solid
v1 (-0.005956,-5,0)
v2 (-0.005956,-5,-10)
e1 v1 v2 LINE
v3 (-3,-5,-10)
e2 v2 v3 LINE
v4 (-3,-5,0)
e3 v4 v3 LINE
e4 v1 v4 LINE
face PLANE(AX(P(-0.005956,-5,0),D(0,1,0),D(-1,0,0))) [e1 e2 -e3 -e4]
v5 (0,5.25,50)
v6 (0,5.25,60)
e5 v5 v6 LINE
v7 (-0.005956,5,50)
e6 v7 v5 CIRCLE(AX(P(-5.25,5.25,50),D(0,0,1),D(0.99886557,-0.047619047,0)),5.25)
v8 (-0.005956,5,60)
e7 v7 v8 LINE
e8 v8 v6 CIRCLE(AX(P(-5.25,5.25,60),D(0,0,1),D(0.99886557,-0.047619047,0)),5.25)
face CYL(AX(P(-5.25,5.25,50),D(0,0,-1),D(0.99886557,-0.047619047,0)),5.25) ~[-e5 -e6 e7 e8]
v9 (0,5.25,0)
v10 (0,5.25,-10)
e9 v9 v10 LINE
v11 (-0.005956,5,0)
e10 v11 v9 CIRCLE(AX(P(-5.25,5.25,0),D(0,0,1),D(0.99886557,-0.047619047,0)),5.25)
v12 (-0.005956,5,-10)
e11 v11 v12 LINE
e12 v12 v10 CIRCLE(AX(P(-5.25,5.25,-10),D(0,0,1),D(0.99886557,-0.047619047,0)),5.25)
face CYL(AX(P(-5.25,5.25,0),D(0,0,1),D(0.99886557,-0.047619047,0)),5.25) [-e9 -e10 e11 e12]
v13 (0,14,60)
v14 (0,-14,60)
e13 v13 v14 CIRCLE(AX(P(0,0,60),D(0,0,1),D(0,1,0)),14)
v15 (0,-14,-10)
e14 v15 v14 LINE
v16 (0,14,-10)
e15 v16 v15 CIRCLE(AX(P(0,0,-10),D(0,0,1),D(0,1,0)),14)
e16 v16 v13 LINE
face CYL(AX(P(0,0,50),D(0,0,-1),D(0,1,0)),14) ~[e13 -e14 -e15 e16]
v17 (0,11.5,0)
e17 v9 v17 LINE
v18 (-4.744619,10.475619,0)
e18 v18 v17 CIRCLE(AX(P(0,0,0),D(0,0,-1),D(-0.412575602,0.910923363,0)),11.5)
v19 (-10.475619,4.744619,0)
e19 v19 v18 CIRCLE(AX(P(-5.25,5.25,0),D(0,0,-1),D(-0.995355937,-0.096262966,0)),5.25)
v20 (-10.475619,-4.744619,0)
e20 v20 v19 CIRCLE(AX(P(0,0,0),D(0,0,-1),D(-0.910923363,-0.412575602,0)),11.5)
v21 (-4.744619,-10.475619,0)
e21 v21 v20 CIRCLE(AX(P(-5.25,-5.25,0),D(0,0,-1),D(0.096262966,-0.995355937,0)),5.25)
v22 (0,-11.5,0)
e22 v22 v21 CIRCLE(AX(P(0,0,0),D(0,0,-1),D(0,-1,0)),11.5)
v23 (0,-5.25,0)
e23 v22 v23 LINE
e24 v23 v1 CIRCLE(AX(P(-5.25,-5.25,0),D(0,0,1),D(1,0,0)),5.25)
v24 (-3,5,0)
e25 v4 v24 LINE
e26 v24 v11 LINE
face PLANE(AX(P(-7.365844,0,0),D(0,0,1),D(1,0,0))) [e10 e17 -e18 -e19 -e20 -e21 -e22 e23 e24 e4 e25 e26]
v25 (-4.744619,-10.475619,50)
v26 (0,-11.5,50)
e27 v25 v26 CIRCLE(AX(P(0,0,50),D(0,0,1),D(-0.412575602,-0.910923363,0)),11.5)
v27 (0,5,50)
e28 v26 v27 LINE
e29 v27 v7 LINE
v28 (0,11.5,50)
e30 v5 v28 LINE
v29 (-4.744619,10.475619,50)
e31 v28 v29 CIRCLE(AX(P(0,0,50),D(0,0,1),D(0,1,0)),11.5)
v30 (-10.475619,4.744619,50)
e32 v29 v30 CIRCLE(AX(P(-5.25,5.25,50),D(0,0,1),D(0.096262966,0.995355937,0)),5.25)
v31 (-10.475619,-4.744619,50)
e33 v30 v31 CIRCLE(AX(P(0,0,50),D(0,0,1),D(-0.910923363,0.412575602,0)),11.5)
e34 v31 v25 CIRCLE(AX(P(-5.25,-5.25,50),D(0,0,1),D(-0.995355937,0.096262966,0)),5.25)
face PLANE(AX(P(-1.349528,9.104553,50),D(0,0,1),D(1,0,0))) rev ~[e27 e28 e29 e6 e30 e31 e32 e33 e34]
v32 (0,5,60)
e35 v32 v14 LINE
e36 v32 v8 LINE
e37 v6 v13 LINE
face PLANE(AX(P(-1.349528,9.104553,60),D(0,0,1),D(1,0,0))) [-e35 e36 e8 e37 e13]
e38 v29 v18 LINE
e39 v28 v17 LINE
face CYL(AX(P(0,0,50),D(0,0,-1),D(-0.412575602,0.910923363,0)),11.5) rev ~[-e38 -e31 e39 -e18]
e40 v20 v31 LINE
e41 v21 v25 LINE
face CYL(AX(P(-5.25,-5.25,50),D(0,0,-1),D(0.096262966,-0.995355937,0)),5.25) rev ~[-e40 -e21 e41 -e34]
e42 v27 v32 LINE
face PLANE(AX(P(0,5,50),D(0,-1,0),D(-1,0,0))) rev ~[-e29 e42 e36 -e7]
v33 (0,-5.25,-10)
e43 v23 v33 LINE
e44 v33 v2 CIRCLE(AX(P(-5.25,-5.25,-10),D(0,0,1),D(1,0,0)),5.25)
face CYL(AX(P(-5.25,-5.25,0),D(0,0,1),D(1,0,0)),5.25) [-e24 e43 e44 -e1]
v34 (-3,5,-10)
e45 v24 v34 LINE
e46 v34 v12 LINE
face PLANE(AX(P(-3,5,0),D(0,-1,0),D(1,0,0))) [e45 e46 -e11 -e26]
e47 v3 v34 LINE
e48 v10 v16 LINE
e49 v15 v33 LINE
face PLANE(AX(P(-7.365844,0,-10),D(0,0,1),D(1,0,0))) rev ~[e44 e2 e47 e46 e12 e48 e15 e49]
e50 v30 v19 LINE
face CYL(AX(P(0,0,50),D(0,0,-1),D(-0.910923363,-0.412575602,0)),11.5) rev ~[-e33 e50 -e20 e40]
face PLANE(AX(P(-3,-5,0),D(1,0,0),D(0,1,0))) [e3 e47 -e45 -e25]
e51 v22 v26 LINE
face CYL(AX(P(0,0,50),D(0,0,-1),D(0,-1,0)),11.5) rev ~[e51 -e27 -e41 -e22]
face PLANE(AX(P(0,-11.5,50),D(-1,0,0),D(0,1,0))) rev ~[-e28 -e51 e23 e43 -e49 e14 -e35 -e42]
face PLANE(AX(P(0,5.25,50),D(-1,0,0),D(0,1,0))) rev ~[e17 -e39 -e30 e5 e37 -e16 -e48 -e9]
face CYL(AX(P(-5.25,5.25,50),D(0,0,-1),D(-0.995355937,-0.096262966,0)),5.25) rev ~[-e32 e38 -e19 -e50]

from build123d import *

# Parameters (mm, degrees)
F1_DEPTH = 10
F2_DEPTH = 50
F3_DEPTH = 10
F4_START = 50
F4_DEPTH = 10


# Not quite as in the source:
# - a feature names something its author has since deleted; it is built from what else it names


with BuildPart() as f1:
    # F0 (on Top) → F1 (new body)
    with BuildSketch(Plane.XY):
        with BuildLine():
            Line((0, 11.5), (0, 14))
            ThreePointArc((0, 14), (-14, 0), (0, -14))
            Line((0, -14), (0, -11.5))
            ThreePointArc((0, -11.5), (-2.4269719101, -11.2409878279), (-4.7446194261, -10.4756186692))
            ThreePointArc((-4.7446194261, -10.4756186692), (-8.9623106012, -8.9623106012), (-10.4756186692, -4.7446194261))
            ThreePointArc((-10.4756186692, -4.7446194261), (-11.5, 0), (-10.4756186692, 4.7446194261))
            ThreePointArc((-10.4756186692, 4.7446194261), (-8.9623106012, 8.9623106012), (-4.7446194261, 10.4756186692))
            ThreePointArc((-4.7446194261, 10.4756186692), (-2.4269719101, 11.2409878279), (0, 11.5))
        make_face()
        with BuildLine():
            ThreePointArc((-4.7446194261, -10.4756186692), (-2.4269719101, -11.2409878279), (0, -11.5))
            Line((0, -11.5), (0, -9))
            Line((0, -9), (0, -5.25))
            ThreePointArc((0, -5.25), (-1.3631151282, -8.7791112186), (-4.7446194261, -10.4756186692))
        make_face()
        with BuildLine():
            Line((-5.25, -5.25), (0, -5.25))
            ThreePointArc((0, -5.25), (-0.001489151, -5.124964534), (-0.0059557591, -5))
            Line((-0.0059557591, -5), (-3, -5))
            Line((-3, -5), (-3, -0.5065835097))
            ThreePointArc((-3, -0.5065835097), (-4.0968383837, -0.1282114172), (-5.2499999999, 0))
            Line((-5.25, 0), (-5.25, -5.25))
        make_face()
        with BuildLine():
            ThreePointArc((-10.4756186692, -4.7446194261), (-8.1317279836, -8.1317279836), (-4.7446194261, -10.4756186692))
            ThreePointArc((-4.7446194261, -10.4756186692), (-1.3631151282, -8.7791112186), (0, -5.25))
            Line((0, -5.25), (-5.25, -5.25))
            Line((-5.25, -5.25), (-5.25, 0))
            ThreePointArc((-5.2499999999, 0), (-8.7791112186, -1.3631151282), (-10.4756186692, -4.7446194261))
        make_face()
        with BuildLine():
            ThreePointArc((-5.2499999999, 0), (-8.7791112186, 1.3631151282), (-10.4756186692, 4.7446194261))
            ThreePointArc((-10.4756186692, 4.7446194261), (-11.5, 0), (-10.4756186692, -4.7446194261))
            ThreePointArc((-10.4756186692, -4.7446194261), (-8.7791112186, -1.3631151282), (-5.2499999999, 0))
        make_face()
        with BuildLine():
            ThreePointArc((-3, 0.5065835097), (-4.0968383837, 0.1282114172), (-5.2499999999, 0))
            ThreePointArc((-5.2499999999, 0), (-4.0968383837, -0.1282114172), (-3, -0.5065835097))
            Line((-3, -0.5065835097), (-3, 0.5065835097))
        make_face()
        with BuildLine():
            ThreePointArc((0, 5.25), (-1.3631151282, 8.7791112186), (-4.7446194261, 10.4756186692))
            ThreePointArc((-4.7446194261, 10.4756186692), (-8.1317279836, 8.1317279836), (-10.4756186692, 4.7446194261))
            ThreePointArc((-10.4756186692, 4.7446194261), (-8.7791112186, 1.3631151282), (-5.2499999999, 0))
            Line((-5.25, 0), (-5.25, 5.25))
            Line((-5.25, 5.25), (0, 5.25))
        make_face()
        with BuildLine():
            Line((0, 9), (0, 11.5))
            ThreePointArc((0, 11.5), (-2.4269719101, 11.2409878279), (-4.7446194261, 10.4756186692))
            ThreePointArc((-4.7446194261, 10.4756186692), (-1.3631151282, 8.7791112186), (0, 5.25))
            Line((0, 5.25), (0, 6))
            Line((0, 6), (0, 9))
        make_face()
        with BuildLine():
            ThreePointArc((-10.4756186692, 4.7446194261), (-8.1317279836, 8.1317279836), (-4.7446194261, 10.4756186692))
            ThreePointArc((-4.7446194261, 10.4756186692), (-8.9623106012, 8.9623106012), (-10.4756186692, 4.7446194261))
        make_face()
        with BuildLine():
            ThreePointArc((-10.4756186692, -4.7446194261), (-8.9623106012, -8.9623106012), (-4.7446194261, -10.4756186692))
            ThreePointArc((-4.7446194261, -10.4756186692), (-8.1317279836, -8.1317279836), (-10.4756186692, -4.7446194261))
        make_face()
        with BuildLine():
            ThreePointArc((-0.0059557591, 5), (-0.001489151, 5.124964534), (0, 5.25))
            Line((0, 5.25), (-5.25, 5.25))
            Line((-5.25, 5.25), (-5.25, 0))
            ThreePointArc((-5.2499999999, 0), (-4.0968383837, 0.1282114172), (-3, 0.5065835097))
            Line((-3, 0.5065835097), (-3, 5))
            Line((-3, 5), (-0.0059557591, 5))
        make_face()
    extrude(amount=-F1_DEPTH)

    # F0 (on Top) → F2 (join)
    with BuildSketch(Plane.XY):
        with BuildLine():
            Line((0, 11.5), (0, 14))
            ThreePointArc((0, 14), (-14, 0), (0, -14))
            Line((0, -14), (0, -11.5))
            ThreePointArc((0, -11.5), (-2.4269719101, -11.2409878279), (-4.7446194261, -10.4756186692))
            ThreePointArc((-4.7446194261, -10.4756186692), (-8.9623106012, -8.9623106012), (-10.4756186692, -4.7446194261))
            ThreePointArc((-10.4756186692, -4.7446194261), (-11.5, 0), (-10.4756186692, 4.7446194261))
            ThreePointArc((-10.4756186692, 4.7446194261), (-8.9623106012, 8.9623106012), (-4.7446194261, 10.4756186692))
            ThreePointArc((-4.7446194261, 10.4756186692), (-2.4269719101, 11.2409878279), (0, 11.5))
        make_face()
    extrude(amount=F2_DEPTH)

    # F3 (add): a face of the model
    f3_faces = [f1.faces().sort_by_distance(p)[0] for p in [
        (-2.4930382043, 11.5469865939, 50),
    ]]
    extrude(f3_faces, amount=F3_DEPTH)

    # F0 (on Top) → F4 (join)
    with BuildSketch(Plane.XY.offset(F4_START)):
        with BuildLine():
            Line((0, 9), (0, 11.5))
            ThreePointArc((0, 11.5), (-2.4269719101, 11.2409878279), (-4.7446194261, 10.4756186692))
            ThreePointArc((-4.7446194261, 10.4756186692), (-1.3631151282, 8.7791112186), (0, 5.25))
            Line((0, 5.25), (0, 6))
            Line((0, 6), (0, 9))
        make_face()
        with BuildLine():
            ThreePointArc((-4.7446194261, -10.4756186692), (-2.4269719101, -11.2409878279), (0, -11.5))
            Line((0, -11.5), (0, -9))
            Line((0, -9), (0, -5.25))
            ThreePointArc((0, -5.25), (-1.3631151282, -8.7791112186), (-4.7446194261, -10.4756186692))
        make_face()
        with BuildLine():
            ThreePointArc((0, 5.25), (-1.3631151282, 8.7791112186), (-4.7446194261, 10.4756186692))
            ThreePointArc((-4.7446194261, 10.4756186692), (-8.1317279836, 8.1317279836), (-10.4756186692, 4.7446194261))
            ThreePointArc((-10.4756186692, 4.7446194261), (-8.7791112186, 1.3631151282), (-5.2499999999, 0))
            Line((-5.25, 0), (-5.25, 5.25))
            Line((-5.25, 5.25), (0, 5.25))
        make_face()
        with BuildLine():
            ThreePointArc((-10.4756186692, 4.7446194261), (-8.1317279836, 8.1317279836), (-4.7446194261, 10.4756186692))
            ThreePointArc((-4.7446194261, 10.4756186692), (-8.9623106012, 8.9623106012), (-10.4756186692, 4.7446194261))
        make_face()
        with BuildLine():
            ThreePointArc((-10.4756186692, -4.7446194261), (-8.9623106012, -8.9623106012), (-4.7446194261, -10.4756186692))
            ThreePointArc((-4.7446194261, -10.4756186692), (-8.1317279836, -8.1317279836), (-10.4756186692, -4.7446194261))
        make_face()
        with BuildLine():
            ThreePointArc((-10.4756186692, -4.7446194261), (-8.1317279836, -8.1317279836), (-4.7446194261, -10.4756186692))
            ThreePointArc((-4.7446194261, -10.4756186692), (-1.3631151282, -8.7791112186), (0, -5.25))
            Line((0, -5.25), (-5.25, -5.25))
            Line((-5.25, -5.25), (-5.25, 0))
            ThreePointArc((-5.2499999999, 0), (-8.7791112186, -1.3631151282), (-10.4756186692, -4.7446194261))
        make_face()
        with BuildLine():
            ThreePointArc((-5.2499999999, 0), (-8.7791112186, 1.3631151282), (-10.4756186692, 4.7446194261))
            ThreePointArc((-10.4756186692, 4.7446194261), (-11.5, 0), (-10.4756186692, -4.7446194261))
            ThreePointArc((-10.4756186692, -4.7446194261), (-8.7791112186, -1.3631151282), (-5.2499999999, 0))
        make_face()
        with BuildLine():
            ThreePointArc((-0.0059557591, 5), (-0.001489151, 5.124964534), (0, 5.25))
            Line((0, 5.25), (-5.25, 5.25))
            Line((-5.25, 5.25), (-5.25, 0))
            ThreePointArc((-5.2499999999, 0), (-4.0968383837, 0.1282114172), (-3, 0.5065835097))
            Line((-3, 0.5065835097), (-3, 5))
            Line((-3, 5), (-0.0059557591, 5))
        make_face()
        with BuildLine():
            ThreePointArc((-0.0059557591, -5), (-0.001489151, -5.124964534), (0, -5.25))
            Line((0, -5.25), (0, -5))
            Line((0, -5), (-0.0059557591, -5))
        make_face()
        with BuildLine():
            Line((-5.25, -5.25), (0, -5.25))
            ThreePointArc((0, -5.25), (-0.001489151, -5.124964534), (-0.0059557591, -5))
            Line((-0.0059557591, -5), (-3, -5))
            Line((-3, -5), (-3, -0.5065835097))
            ThreePointArc((-3, -0.5065835097), (-4.0968383837, -0.1282114172), (-5.2499999999, 0))
            Line((-5.25, 0), (-5.25, -5.25))
        make_face()
        with BuildLine():
            ThreePointArc((-3, 0.5065835097), (-4.0968383837, 0.1282114172), (-5.2499999999, 0))
            ThreePointArc((-5.2499999999, 0), (-4.0968383837, -0.1282114172), (-3, -0.5065835097))
            Line((-3, -0.5065835097), (-3, 0.5065835097))
        make_face()
        with BuildLine():
            Line((0, 0), (0, 5))
            Line((0, 5), (-0.0059557591, 5))
            ThreePointArc((-0.0059557591, 5), (-0.8810329928, 2.3388786885), (-3, 0.5065835097))
            Line((-3, 0.5065835097), (-3, -0.5065835097))
            ThreePointArc((-3, -0.5065835097), (-0.8810329928, -2.3388786885), (-0.0059557591, -5))
            Line((-0.0059557591, -5), (0, -5))
            Line((0, -5), (0, 0))
        make_face()
        with BuildLine():
            ThreePointArc((-3, 0.5065835097), (-0.8810329928, 2.3388786885), (-0.0059557591, 5))
            Line((-0.0059557591, 5), (-3, 5))
            Line((-3, 5), (-3, 0.5065835097))
        make_face()
        with BuildLine():
            Line((-3, -5), (-0.0059557591, -5))
            ThreePointArc((-0.0059557591, -5), (-0.8810329928, -2.3388786885), (-3, -0.5065835097))
            Line((-3, -0.5065835097), (-3, -5))
        make_face()
    extrude(amount=F4_DEPTH)


solid = f1.part
